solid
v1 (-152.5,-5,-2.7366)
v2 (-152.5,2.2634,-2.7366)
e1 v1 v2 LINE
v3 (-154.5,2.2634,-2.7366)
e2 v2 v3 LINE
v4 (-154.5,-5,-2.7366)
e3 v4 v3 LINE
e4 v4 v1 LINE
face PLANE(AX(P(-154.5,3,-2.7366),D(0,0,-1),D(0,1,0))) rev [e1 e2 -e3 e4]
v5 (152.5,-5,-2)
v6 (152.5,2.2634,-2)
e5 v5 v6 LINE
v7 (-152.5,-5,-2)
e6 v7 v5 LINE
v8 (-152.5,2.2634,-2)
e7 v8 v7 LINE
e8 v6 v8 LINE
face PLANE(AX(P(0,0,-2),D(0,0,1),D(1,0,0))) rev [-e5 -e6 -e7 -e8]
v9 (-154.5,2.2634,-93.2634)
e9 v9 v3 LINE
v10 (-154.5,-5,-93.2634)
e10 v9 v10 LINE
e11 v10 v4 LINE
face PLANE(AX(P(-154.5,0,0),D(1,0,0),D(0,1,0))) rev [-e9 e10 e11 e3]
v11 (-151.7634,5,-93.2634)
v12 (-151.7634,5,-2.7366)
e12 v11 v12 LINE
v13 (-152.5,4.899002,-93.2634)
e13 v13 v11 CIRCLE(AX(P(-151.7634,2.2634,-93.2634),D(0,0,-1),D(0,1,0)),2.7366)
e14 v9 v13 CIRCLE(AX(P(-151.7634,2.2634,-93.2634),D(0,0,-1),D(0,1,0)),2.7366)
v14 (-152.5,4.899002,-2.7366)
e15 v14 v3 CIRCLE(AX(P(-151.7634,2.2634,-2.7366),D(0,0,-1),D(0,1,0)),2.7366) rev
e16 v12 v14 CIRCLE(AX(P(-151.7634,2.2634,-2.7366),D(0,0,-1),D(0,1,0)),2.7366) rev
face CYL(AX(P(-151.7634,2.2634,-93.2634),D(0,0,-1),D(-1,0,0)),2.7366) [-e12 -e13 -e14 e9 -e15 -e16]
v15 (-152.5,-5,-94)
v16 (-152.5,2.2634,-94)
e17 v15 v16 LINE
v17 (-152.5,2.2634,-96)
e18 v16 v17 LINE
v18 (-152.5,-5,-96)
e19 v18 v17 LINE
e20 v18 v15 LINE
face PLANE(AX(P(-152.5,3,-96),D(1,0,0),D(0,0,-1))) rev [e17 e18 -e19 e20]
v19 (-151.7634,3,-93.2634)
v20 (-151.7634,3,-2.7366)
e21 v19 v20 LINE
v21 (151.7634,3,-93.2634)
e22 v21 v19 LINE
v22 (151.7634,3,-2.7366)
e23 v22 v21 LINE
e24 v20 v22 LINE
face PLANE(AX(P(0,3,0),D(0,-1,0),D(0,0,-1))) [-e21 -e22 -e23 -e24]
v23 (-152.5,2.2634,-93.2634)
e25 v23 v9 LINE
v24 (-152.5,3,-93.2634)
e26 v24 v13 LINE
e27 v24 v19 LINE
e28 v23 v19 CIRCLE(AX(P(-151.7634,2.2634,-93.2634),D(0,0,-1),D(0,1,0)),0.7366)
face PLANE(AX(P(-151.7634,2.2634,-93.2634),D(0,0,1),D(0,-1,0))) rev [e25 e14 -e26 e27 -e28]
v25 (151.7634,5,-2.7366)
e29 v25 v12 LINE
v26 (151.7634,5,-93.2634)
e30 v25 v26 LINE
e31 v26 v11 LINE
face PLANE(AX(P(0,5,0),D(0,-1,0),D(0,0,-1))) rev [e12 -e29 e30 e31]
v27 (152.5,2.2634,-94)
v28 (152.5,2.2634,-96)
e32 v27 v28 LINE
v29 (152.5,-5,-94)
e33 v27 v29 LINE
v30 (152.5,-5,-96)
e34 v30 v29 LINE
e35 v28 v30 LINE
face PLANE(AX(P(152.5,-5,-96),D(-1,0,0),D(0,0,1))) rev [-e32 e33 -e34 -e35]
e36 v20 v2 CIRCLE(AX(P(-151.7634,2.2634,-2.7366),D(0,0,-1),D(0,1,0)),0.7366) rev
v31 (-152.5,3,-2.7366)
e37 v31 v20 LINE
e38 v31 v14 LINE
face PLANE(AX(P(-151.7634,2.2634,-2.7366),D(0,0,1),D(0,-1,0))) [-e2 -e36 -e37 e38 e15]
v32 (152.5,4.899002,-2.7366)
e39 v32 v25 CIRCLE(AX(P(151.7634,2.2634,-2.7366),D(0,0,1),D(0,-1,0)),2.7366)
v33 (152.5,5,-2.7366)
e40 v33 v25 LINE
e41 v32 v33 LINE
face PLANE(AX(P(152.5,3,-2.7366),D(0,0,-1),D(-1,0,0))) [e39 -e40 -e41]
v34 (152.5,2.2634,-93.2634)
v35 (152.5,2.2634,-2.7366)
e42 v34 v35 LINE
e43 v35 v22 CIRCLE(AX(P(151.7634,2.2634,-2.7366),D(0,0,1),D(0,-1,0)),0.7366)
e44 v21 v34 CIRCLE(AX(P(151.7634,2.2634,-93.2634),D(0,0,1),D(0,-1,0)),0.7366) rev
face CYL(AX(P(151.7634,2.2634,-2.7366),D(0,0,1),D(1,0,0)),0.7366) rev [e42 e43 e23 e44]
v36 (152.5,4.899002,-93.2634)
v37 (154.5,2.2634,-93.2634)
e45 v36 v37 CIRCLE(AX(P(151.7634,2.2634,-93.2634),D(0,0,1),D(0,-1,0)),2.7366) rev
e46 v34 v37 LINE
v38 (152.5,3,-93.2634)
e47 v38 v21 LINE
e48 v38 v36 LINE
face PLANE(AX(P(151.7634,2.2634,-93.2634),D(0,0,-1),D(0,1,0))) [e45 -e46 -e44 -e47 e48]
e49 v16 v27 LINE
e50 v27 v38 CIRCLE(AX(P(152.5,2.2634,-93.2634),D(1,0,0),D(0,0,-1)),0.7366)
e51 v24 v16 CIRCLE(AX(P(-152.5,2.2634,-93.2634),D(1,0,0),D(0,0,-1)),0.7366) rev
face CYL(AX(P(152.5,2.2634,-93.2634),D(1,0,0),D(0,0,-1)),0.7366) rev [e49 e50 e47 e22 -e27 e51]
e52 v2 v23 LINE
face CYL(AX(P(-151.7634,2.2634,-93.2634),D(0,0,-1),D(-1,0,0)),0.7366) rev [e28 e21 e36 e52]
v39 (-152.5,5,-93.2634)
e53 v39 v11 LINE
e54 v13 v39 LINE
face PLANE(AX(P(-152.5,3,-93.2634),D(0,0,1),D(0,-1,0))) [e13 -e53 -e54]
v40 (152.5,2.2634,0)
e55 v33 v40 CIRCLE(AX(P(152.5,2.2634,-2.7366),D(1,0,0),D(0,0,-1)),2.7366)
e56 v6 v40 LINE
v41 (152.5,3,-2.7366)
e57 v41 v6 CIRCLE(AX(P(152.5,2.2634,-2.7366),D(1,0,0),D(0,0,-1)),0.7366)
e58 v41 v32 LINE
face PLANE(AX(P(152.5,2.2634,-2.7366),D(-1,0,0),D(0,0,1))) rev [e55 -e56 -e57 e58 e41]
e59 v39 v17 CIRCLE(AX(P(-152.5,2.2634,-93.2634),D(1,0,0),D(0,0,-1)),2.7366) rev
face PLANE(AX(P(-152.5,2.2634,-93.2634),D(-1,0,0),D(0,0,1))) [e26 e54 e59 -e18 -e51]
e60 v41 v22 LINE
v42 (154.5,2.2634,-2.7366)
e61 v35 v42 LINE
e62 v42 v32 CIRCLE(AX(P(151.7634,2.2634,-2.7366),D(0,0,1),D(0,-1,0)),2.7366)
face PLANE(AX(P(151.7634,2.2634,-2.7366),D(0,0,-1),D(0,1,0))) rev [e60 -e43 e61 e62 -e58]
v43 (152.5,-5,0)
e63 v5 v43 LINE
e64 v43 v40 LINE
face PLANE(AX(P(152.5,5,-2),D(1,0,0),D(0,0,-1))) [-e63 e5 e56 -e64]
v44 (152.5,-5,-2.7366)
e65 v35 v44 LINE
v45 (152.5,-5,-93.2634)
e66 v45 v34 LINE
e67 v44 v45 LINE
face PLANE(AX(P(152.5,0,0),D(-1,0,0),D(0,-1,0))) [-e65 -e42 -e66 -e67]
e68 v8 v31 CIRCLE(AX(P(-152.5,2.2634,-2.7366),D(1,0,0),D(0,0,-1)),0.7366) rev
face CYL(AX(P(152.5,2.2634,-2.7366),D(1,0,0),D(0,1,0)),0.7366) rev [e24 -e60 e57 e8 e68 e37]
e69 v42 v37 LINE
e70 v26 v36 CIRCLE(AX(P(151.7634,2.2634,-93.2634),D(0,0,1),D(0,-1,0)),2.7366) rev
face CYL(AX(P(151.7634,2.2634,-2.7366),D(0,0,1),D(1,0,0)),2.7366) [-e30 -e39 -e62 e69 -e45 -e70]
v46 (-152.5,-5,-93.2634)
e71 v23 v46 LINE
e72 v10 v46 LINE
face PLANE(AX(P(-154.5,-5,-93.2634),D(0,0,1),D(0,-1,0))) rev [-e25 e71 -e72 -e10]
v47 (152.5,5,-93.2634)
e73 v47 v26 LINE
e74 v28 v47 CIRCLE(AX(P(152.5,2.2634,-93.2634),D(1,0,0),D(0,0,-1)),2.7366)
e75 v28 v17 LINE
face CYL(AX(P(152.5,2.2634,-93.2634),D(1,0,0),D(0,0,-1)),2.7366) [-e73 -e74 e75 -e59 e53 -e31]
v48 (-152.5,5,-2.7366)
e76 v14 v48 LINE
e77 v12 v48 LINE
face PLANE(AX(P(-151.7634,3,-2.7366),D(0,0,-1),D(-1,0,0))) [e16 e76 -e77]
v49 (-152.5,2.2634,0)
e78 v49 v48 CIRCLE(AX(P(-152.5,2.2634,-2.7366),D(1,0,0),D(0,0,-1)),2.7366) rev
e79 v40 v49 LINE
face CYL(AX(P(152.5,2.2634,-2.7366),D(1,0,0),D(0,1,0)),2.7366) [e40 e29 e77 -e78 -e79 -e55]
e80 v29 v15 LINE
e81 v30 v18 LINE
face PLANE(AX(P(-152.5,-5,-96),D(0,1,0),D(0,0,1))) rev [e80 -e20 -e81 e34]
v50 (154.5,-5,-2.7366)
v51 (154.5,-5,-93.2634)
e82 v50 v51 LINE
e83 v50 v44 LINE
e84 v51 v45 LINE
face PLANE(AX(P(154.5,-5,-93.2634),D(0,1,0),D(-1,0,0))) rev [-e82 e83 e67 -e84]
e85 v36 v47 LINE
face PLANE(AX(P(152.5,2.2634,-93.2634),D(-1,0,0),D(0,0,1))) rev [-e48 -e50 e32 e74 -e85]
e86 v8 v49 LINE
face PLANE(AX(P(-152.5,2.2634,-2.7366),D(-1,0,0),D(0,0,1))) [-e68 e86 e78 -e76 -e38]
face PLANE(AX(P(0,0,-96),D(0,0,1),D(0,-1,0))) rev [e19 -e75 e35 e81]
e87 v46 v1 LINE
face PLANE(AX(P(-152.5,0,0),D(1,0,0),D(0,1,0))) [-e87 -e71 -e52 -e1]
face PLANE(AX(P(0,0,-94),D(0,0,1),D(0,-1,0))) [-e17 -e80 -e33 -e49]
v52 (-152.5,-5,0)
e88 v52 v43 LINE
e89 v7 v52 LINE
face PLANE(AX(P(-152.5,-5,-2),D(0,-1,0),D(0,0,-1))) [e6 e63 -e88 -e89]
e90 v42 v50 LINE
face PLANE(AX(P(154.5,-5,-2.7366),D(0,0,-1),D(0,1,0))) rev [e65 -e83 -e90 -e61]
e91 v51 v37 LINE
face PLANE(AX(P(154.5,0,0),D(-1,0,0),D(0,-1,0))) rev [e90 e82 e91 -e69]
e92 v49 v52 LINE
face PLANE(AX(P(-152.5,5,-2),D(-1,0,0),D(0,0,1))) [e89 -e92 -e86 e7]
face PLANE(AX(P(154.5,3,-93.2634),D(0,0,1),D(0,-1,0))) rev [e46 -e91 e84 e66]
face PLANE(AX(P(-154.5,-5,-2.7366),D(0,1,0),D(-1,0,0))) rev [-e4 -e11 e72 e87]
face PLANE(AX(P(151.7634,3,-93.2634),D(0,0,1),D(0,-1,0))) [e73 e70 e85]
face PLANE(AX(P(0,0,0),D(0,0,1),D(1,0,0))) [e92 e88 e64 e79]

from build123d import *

# Parameters (mm, degrees)
SKETCH1_W                    = 305
SKETCH1_H                    = 10
BASE_FLANGE3_DEPTH           = 2
EDGE_FLANGE1_STRIP_W         = 9.4732
EDGE_FLANGE1_STRIP_H         = 2
EDGE_FLANGE1_STRIP_CUT_DEPTH = 305
EDGE_FLANGE1_DEPTH           = 305
EDGE_FLANGE2_STRIP_W         = 9.4732
EDGE_FLANGE2_STRIP_H         = 2
EDGE_FLANGE2_STRIP_CUT_DEPTH = 305
EDGE_FLANGE2_DEPTH           = 305
EDGE_FLANGE3_STRIP_W         = 9.4732
EDGE_FLANGE3_STRIP_H         = 2
EDGE_FLANGE3_STRIP_CUT_DEPTH = 90.5268
EDGE_FLANGE3_DEPTH           = 90.5268
EDGE_FLANGE4_STRIP_W         = 9.4732
EDGE_FLANGE4_STRIP_H         = 2
EDGE_FLANGE4_STRIP_CUT_DEPTH = 90.5268
EDGE_FLANGE4_DEPTH           = 90.5268


# Sheet-metal steps are written as plain solids
with BuildPart() as part:
    # Sketch1 → Base-Flange3 (new body)
    with BuildSketch(Plane.XY):
        Rectangle(SKETCH1_W, SKETCH1_H)
    extrude(amount=-BASE_FLANGE3_DEPTH)

    # Edge-Flange1 strip (across the edge) → Edge-Flange1 strip cut (cut)
    with BuildSketch(Plane(origin=(-152.5, 5, -2), x_dir=(0, -1, 0), z_dir=(1, 0, 0))):
        with Locations((-2, -1)):
            Rectangle(EDGE_FLANGE1_STRIP_W, EDGE_FLANGE1_STRIP_H)
    extrude(amount=EDGE_FLANGE1_STRIP_CUT_DEPTH, mode=Mode.SUBTRACT)

    # Edge-Flange1 section (across the edge) → Edge-Flange1 (add)
    with BuildSketch(Plane(origin=(-152.5, 5, -2), x_dir=(0, -1, 0), z_dir=(1, 0, 0))):
        with BuildLine():
            Line((0, 0.7366), (0, 94))
            Line((0, 94), (2, 94))
            Line((2, 94), (2, 0.7366))
            ThreePointArc((2, 0.7366), (2.215745145, 0.215745145), (2.7366, 0))
            Line((2.7366, 0), (2.7366, -2))
            ThreePointArc((2.7366, -2), (0.801531583, -1.198468417), (0, 0.7366))
        make_face()
    extrude(amount=EDGE_FLANGE1_DEPTH)

    # Edge-Flange2 strip (across the edge) → Edge-Flange2 strip cut (cut)
    with BuildSketch(Plane(origin=(-152.5, 3, -96), x_dir=(0, 0, 1), z_dir=(1, 0, 0))):
        with Locations((-2, -1)):
            Rectangle(EDGE_FLANGE2_STRIP_W, EDGE_FLANGE2_STRIP_H)
    extrude(amount=EDGE_FLANGE2_STRIP_CUT_DEPTH, mode=Mode.SUBTRACT)

    # Edge-Flange2 section (across the edge) → Edge-Flange2 (add)
    with BuildSketch(Plane(origin=(-152.5, 3, -96), x_dir=(0, 0, 1), z_dir=(1, 0, 0))):
        with BuildLine():
            Line((0, 0.7366), (0, 8))
            Line((0, 8), (2, 8))
            Line((2, 8), (2, 0.7366))
            ThreePointArc((2, 0.7366), (2.215745145, 0.215745145), (2.7366, 0))
            Line((2.7366, 0), (2.7366, -2))
            ThreePointArc((2.7366, -2), (0.801531583, -1.198468417), (0, 0.7366))
        make_face()
    extrude(amount=EDGE_FLANGE2_DEPTH)

    # Edge-Flange3 strip (across the edge) → Edge-Flange3 strip cut (cut)
    with BuildSketch(Plane(origin=(-152.5, 3, -2.7366), x_dir=(1, 0, 0), z_dir=(0, 0, -1))):
        with Locations((-4, -1)):
            Rectangle(EDGE_FLANGE3_STRIP_W, EDGE_FLANGE3_STRIP_H)
    extrude(amount=EDGE_FLANGE3_STRIP_CUT_DEPTH, mode=Mode.SUBTRACT)

    # Edge-Flange3 section (across the edge) → Edge-Flange3 (add)
    with BuildSketch(Plane(origin=(-152.5, 3, -2.7366), x_dir=(1, 0, 0), z_dir=(0, 0, -1))):
        with BuildLine():
            Line((-2, 0.7366), (-2, 8))
            Line((-2, 8), (0, 8))
            Line((0, 8), (0, 0.7366))
            ThreePointArc((0, 0.7366), (0.215745145, 0.215745145), (0.7366, 0))
            Line((0.7366, 0), (0.7366, -2))
            ThreePointArc((0.7366, -2), (-1.198468417, -1.198468417), (-2, 0.7366))
        make_face()
    extrude(amount=EDGE_FLANGE3_DEPTH)

    # Edge-Flange4 strip (across the edge) → Edge-Flange4 strip cut (cut)
    with BuildSketch(Plane(origin=(152.5, 3, -93.2634), x_dir=(-1, 0, 0), z_dir=(0, 0, 1))):
        with Locations((-4, -1)):
            Rectangle(EDGE_FLANGE4_STRIP_W, EDGE_FLANGE4_STRIP_H)
    extrude(amount=EDGE_FLANGE4_STRIP_CUT_DEPTH, mode=Mode.SUBTRACT)

    # Edge-Flange4 section (across the edge) → Edge-Flange4 (add)
    with BuildSketch(Plane(origin=(152.5, 3, -93.2634), x_dir=(-1, 0, 0), z_dir=(0, 0, 1))):
        with BuildLine():
            Line((-2, 0.7366), (-2, 8))
            Line((-2, 8), (0, 8))
            Line((0, 8), (0, 0.7366))
            ThreePointArc((0, 0.7366), (0.215745145, 0.215745145), (0.7366, 0))
            Line((0.7366, 0), (0.7366, -2))
            ThreePointArc((0.7366, -2), (-1.198468417, -1.198468417), (-2, 0.7366))
        make_face()
    extrude(amount=EDGE_FLANGE4_DEPTH)


solid = part.part
